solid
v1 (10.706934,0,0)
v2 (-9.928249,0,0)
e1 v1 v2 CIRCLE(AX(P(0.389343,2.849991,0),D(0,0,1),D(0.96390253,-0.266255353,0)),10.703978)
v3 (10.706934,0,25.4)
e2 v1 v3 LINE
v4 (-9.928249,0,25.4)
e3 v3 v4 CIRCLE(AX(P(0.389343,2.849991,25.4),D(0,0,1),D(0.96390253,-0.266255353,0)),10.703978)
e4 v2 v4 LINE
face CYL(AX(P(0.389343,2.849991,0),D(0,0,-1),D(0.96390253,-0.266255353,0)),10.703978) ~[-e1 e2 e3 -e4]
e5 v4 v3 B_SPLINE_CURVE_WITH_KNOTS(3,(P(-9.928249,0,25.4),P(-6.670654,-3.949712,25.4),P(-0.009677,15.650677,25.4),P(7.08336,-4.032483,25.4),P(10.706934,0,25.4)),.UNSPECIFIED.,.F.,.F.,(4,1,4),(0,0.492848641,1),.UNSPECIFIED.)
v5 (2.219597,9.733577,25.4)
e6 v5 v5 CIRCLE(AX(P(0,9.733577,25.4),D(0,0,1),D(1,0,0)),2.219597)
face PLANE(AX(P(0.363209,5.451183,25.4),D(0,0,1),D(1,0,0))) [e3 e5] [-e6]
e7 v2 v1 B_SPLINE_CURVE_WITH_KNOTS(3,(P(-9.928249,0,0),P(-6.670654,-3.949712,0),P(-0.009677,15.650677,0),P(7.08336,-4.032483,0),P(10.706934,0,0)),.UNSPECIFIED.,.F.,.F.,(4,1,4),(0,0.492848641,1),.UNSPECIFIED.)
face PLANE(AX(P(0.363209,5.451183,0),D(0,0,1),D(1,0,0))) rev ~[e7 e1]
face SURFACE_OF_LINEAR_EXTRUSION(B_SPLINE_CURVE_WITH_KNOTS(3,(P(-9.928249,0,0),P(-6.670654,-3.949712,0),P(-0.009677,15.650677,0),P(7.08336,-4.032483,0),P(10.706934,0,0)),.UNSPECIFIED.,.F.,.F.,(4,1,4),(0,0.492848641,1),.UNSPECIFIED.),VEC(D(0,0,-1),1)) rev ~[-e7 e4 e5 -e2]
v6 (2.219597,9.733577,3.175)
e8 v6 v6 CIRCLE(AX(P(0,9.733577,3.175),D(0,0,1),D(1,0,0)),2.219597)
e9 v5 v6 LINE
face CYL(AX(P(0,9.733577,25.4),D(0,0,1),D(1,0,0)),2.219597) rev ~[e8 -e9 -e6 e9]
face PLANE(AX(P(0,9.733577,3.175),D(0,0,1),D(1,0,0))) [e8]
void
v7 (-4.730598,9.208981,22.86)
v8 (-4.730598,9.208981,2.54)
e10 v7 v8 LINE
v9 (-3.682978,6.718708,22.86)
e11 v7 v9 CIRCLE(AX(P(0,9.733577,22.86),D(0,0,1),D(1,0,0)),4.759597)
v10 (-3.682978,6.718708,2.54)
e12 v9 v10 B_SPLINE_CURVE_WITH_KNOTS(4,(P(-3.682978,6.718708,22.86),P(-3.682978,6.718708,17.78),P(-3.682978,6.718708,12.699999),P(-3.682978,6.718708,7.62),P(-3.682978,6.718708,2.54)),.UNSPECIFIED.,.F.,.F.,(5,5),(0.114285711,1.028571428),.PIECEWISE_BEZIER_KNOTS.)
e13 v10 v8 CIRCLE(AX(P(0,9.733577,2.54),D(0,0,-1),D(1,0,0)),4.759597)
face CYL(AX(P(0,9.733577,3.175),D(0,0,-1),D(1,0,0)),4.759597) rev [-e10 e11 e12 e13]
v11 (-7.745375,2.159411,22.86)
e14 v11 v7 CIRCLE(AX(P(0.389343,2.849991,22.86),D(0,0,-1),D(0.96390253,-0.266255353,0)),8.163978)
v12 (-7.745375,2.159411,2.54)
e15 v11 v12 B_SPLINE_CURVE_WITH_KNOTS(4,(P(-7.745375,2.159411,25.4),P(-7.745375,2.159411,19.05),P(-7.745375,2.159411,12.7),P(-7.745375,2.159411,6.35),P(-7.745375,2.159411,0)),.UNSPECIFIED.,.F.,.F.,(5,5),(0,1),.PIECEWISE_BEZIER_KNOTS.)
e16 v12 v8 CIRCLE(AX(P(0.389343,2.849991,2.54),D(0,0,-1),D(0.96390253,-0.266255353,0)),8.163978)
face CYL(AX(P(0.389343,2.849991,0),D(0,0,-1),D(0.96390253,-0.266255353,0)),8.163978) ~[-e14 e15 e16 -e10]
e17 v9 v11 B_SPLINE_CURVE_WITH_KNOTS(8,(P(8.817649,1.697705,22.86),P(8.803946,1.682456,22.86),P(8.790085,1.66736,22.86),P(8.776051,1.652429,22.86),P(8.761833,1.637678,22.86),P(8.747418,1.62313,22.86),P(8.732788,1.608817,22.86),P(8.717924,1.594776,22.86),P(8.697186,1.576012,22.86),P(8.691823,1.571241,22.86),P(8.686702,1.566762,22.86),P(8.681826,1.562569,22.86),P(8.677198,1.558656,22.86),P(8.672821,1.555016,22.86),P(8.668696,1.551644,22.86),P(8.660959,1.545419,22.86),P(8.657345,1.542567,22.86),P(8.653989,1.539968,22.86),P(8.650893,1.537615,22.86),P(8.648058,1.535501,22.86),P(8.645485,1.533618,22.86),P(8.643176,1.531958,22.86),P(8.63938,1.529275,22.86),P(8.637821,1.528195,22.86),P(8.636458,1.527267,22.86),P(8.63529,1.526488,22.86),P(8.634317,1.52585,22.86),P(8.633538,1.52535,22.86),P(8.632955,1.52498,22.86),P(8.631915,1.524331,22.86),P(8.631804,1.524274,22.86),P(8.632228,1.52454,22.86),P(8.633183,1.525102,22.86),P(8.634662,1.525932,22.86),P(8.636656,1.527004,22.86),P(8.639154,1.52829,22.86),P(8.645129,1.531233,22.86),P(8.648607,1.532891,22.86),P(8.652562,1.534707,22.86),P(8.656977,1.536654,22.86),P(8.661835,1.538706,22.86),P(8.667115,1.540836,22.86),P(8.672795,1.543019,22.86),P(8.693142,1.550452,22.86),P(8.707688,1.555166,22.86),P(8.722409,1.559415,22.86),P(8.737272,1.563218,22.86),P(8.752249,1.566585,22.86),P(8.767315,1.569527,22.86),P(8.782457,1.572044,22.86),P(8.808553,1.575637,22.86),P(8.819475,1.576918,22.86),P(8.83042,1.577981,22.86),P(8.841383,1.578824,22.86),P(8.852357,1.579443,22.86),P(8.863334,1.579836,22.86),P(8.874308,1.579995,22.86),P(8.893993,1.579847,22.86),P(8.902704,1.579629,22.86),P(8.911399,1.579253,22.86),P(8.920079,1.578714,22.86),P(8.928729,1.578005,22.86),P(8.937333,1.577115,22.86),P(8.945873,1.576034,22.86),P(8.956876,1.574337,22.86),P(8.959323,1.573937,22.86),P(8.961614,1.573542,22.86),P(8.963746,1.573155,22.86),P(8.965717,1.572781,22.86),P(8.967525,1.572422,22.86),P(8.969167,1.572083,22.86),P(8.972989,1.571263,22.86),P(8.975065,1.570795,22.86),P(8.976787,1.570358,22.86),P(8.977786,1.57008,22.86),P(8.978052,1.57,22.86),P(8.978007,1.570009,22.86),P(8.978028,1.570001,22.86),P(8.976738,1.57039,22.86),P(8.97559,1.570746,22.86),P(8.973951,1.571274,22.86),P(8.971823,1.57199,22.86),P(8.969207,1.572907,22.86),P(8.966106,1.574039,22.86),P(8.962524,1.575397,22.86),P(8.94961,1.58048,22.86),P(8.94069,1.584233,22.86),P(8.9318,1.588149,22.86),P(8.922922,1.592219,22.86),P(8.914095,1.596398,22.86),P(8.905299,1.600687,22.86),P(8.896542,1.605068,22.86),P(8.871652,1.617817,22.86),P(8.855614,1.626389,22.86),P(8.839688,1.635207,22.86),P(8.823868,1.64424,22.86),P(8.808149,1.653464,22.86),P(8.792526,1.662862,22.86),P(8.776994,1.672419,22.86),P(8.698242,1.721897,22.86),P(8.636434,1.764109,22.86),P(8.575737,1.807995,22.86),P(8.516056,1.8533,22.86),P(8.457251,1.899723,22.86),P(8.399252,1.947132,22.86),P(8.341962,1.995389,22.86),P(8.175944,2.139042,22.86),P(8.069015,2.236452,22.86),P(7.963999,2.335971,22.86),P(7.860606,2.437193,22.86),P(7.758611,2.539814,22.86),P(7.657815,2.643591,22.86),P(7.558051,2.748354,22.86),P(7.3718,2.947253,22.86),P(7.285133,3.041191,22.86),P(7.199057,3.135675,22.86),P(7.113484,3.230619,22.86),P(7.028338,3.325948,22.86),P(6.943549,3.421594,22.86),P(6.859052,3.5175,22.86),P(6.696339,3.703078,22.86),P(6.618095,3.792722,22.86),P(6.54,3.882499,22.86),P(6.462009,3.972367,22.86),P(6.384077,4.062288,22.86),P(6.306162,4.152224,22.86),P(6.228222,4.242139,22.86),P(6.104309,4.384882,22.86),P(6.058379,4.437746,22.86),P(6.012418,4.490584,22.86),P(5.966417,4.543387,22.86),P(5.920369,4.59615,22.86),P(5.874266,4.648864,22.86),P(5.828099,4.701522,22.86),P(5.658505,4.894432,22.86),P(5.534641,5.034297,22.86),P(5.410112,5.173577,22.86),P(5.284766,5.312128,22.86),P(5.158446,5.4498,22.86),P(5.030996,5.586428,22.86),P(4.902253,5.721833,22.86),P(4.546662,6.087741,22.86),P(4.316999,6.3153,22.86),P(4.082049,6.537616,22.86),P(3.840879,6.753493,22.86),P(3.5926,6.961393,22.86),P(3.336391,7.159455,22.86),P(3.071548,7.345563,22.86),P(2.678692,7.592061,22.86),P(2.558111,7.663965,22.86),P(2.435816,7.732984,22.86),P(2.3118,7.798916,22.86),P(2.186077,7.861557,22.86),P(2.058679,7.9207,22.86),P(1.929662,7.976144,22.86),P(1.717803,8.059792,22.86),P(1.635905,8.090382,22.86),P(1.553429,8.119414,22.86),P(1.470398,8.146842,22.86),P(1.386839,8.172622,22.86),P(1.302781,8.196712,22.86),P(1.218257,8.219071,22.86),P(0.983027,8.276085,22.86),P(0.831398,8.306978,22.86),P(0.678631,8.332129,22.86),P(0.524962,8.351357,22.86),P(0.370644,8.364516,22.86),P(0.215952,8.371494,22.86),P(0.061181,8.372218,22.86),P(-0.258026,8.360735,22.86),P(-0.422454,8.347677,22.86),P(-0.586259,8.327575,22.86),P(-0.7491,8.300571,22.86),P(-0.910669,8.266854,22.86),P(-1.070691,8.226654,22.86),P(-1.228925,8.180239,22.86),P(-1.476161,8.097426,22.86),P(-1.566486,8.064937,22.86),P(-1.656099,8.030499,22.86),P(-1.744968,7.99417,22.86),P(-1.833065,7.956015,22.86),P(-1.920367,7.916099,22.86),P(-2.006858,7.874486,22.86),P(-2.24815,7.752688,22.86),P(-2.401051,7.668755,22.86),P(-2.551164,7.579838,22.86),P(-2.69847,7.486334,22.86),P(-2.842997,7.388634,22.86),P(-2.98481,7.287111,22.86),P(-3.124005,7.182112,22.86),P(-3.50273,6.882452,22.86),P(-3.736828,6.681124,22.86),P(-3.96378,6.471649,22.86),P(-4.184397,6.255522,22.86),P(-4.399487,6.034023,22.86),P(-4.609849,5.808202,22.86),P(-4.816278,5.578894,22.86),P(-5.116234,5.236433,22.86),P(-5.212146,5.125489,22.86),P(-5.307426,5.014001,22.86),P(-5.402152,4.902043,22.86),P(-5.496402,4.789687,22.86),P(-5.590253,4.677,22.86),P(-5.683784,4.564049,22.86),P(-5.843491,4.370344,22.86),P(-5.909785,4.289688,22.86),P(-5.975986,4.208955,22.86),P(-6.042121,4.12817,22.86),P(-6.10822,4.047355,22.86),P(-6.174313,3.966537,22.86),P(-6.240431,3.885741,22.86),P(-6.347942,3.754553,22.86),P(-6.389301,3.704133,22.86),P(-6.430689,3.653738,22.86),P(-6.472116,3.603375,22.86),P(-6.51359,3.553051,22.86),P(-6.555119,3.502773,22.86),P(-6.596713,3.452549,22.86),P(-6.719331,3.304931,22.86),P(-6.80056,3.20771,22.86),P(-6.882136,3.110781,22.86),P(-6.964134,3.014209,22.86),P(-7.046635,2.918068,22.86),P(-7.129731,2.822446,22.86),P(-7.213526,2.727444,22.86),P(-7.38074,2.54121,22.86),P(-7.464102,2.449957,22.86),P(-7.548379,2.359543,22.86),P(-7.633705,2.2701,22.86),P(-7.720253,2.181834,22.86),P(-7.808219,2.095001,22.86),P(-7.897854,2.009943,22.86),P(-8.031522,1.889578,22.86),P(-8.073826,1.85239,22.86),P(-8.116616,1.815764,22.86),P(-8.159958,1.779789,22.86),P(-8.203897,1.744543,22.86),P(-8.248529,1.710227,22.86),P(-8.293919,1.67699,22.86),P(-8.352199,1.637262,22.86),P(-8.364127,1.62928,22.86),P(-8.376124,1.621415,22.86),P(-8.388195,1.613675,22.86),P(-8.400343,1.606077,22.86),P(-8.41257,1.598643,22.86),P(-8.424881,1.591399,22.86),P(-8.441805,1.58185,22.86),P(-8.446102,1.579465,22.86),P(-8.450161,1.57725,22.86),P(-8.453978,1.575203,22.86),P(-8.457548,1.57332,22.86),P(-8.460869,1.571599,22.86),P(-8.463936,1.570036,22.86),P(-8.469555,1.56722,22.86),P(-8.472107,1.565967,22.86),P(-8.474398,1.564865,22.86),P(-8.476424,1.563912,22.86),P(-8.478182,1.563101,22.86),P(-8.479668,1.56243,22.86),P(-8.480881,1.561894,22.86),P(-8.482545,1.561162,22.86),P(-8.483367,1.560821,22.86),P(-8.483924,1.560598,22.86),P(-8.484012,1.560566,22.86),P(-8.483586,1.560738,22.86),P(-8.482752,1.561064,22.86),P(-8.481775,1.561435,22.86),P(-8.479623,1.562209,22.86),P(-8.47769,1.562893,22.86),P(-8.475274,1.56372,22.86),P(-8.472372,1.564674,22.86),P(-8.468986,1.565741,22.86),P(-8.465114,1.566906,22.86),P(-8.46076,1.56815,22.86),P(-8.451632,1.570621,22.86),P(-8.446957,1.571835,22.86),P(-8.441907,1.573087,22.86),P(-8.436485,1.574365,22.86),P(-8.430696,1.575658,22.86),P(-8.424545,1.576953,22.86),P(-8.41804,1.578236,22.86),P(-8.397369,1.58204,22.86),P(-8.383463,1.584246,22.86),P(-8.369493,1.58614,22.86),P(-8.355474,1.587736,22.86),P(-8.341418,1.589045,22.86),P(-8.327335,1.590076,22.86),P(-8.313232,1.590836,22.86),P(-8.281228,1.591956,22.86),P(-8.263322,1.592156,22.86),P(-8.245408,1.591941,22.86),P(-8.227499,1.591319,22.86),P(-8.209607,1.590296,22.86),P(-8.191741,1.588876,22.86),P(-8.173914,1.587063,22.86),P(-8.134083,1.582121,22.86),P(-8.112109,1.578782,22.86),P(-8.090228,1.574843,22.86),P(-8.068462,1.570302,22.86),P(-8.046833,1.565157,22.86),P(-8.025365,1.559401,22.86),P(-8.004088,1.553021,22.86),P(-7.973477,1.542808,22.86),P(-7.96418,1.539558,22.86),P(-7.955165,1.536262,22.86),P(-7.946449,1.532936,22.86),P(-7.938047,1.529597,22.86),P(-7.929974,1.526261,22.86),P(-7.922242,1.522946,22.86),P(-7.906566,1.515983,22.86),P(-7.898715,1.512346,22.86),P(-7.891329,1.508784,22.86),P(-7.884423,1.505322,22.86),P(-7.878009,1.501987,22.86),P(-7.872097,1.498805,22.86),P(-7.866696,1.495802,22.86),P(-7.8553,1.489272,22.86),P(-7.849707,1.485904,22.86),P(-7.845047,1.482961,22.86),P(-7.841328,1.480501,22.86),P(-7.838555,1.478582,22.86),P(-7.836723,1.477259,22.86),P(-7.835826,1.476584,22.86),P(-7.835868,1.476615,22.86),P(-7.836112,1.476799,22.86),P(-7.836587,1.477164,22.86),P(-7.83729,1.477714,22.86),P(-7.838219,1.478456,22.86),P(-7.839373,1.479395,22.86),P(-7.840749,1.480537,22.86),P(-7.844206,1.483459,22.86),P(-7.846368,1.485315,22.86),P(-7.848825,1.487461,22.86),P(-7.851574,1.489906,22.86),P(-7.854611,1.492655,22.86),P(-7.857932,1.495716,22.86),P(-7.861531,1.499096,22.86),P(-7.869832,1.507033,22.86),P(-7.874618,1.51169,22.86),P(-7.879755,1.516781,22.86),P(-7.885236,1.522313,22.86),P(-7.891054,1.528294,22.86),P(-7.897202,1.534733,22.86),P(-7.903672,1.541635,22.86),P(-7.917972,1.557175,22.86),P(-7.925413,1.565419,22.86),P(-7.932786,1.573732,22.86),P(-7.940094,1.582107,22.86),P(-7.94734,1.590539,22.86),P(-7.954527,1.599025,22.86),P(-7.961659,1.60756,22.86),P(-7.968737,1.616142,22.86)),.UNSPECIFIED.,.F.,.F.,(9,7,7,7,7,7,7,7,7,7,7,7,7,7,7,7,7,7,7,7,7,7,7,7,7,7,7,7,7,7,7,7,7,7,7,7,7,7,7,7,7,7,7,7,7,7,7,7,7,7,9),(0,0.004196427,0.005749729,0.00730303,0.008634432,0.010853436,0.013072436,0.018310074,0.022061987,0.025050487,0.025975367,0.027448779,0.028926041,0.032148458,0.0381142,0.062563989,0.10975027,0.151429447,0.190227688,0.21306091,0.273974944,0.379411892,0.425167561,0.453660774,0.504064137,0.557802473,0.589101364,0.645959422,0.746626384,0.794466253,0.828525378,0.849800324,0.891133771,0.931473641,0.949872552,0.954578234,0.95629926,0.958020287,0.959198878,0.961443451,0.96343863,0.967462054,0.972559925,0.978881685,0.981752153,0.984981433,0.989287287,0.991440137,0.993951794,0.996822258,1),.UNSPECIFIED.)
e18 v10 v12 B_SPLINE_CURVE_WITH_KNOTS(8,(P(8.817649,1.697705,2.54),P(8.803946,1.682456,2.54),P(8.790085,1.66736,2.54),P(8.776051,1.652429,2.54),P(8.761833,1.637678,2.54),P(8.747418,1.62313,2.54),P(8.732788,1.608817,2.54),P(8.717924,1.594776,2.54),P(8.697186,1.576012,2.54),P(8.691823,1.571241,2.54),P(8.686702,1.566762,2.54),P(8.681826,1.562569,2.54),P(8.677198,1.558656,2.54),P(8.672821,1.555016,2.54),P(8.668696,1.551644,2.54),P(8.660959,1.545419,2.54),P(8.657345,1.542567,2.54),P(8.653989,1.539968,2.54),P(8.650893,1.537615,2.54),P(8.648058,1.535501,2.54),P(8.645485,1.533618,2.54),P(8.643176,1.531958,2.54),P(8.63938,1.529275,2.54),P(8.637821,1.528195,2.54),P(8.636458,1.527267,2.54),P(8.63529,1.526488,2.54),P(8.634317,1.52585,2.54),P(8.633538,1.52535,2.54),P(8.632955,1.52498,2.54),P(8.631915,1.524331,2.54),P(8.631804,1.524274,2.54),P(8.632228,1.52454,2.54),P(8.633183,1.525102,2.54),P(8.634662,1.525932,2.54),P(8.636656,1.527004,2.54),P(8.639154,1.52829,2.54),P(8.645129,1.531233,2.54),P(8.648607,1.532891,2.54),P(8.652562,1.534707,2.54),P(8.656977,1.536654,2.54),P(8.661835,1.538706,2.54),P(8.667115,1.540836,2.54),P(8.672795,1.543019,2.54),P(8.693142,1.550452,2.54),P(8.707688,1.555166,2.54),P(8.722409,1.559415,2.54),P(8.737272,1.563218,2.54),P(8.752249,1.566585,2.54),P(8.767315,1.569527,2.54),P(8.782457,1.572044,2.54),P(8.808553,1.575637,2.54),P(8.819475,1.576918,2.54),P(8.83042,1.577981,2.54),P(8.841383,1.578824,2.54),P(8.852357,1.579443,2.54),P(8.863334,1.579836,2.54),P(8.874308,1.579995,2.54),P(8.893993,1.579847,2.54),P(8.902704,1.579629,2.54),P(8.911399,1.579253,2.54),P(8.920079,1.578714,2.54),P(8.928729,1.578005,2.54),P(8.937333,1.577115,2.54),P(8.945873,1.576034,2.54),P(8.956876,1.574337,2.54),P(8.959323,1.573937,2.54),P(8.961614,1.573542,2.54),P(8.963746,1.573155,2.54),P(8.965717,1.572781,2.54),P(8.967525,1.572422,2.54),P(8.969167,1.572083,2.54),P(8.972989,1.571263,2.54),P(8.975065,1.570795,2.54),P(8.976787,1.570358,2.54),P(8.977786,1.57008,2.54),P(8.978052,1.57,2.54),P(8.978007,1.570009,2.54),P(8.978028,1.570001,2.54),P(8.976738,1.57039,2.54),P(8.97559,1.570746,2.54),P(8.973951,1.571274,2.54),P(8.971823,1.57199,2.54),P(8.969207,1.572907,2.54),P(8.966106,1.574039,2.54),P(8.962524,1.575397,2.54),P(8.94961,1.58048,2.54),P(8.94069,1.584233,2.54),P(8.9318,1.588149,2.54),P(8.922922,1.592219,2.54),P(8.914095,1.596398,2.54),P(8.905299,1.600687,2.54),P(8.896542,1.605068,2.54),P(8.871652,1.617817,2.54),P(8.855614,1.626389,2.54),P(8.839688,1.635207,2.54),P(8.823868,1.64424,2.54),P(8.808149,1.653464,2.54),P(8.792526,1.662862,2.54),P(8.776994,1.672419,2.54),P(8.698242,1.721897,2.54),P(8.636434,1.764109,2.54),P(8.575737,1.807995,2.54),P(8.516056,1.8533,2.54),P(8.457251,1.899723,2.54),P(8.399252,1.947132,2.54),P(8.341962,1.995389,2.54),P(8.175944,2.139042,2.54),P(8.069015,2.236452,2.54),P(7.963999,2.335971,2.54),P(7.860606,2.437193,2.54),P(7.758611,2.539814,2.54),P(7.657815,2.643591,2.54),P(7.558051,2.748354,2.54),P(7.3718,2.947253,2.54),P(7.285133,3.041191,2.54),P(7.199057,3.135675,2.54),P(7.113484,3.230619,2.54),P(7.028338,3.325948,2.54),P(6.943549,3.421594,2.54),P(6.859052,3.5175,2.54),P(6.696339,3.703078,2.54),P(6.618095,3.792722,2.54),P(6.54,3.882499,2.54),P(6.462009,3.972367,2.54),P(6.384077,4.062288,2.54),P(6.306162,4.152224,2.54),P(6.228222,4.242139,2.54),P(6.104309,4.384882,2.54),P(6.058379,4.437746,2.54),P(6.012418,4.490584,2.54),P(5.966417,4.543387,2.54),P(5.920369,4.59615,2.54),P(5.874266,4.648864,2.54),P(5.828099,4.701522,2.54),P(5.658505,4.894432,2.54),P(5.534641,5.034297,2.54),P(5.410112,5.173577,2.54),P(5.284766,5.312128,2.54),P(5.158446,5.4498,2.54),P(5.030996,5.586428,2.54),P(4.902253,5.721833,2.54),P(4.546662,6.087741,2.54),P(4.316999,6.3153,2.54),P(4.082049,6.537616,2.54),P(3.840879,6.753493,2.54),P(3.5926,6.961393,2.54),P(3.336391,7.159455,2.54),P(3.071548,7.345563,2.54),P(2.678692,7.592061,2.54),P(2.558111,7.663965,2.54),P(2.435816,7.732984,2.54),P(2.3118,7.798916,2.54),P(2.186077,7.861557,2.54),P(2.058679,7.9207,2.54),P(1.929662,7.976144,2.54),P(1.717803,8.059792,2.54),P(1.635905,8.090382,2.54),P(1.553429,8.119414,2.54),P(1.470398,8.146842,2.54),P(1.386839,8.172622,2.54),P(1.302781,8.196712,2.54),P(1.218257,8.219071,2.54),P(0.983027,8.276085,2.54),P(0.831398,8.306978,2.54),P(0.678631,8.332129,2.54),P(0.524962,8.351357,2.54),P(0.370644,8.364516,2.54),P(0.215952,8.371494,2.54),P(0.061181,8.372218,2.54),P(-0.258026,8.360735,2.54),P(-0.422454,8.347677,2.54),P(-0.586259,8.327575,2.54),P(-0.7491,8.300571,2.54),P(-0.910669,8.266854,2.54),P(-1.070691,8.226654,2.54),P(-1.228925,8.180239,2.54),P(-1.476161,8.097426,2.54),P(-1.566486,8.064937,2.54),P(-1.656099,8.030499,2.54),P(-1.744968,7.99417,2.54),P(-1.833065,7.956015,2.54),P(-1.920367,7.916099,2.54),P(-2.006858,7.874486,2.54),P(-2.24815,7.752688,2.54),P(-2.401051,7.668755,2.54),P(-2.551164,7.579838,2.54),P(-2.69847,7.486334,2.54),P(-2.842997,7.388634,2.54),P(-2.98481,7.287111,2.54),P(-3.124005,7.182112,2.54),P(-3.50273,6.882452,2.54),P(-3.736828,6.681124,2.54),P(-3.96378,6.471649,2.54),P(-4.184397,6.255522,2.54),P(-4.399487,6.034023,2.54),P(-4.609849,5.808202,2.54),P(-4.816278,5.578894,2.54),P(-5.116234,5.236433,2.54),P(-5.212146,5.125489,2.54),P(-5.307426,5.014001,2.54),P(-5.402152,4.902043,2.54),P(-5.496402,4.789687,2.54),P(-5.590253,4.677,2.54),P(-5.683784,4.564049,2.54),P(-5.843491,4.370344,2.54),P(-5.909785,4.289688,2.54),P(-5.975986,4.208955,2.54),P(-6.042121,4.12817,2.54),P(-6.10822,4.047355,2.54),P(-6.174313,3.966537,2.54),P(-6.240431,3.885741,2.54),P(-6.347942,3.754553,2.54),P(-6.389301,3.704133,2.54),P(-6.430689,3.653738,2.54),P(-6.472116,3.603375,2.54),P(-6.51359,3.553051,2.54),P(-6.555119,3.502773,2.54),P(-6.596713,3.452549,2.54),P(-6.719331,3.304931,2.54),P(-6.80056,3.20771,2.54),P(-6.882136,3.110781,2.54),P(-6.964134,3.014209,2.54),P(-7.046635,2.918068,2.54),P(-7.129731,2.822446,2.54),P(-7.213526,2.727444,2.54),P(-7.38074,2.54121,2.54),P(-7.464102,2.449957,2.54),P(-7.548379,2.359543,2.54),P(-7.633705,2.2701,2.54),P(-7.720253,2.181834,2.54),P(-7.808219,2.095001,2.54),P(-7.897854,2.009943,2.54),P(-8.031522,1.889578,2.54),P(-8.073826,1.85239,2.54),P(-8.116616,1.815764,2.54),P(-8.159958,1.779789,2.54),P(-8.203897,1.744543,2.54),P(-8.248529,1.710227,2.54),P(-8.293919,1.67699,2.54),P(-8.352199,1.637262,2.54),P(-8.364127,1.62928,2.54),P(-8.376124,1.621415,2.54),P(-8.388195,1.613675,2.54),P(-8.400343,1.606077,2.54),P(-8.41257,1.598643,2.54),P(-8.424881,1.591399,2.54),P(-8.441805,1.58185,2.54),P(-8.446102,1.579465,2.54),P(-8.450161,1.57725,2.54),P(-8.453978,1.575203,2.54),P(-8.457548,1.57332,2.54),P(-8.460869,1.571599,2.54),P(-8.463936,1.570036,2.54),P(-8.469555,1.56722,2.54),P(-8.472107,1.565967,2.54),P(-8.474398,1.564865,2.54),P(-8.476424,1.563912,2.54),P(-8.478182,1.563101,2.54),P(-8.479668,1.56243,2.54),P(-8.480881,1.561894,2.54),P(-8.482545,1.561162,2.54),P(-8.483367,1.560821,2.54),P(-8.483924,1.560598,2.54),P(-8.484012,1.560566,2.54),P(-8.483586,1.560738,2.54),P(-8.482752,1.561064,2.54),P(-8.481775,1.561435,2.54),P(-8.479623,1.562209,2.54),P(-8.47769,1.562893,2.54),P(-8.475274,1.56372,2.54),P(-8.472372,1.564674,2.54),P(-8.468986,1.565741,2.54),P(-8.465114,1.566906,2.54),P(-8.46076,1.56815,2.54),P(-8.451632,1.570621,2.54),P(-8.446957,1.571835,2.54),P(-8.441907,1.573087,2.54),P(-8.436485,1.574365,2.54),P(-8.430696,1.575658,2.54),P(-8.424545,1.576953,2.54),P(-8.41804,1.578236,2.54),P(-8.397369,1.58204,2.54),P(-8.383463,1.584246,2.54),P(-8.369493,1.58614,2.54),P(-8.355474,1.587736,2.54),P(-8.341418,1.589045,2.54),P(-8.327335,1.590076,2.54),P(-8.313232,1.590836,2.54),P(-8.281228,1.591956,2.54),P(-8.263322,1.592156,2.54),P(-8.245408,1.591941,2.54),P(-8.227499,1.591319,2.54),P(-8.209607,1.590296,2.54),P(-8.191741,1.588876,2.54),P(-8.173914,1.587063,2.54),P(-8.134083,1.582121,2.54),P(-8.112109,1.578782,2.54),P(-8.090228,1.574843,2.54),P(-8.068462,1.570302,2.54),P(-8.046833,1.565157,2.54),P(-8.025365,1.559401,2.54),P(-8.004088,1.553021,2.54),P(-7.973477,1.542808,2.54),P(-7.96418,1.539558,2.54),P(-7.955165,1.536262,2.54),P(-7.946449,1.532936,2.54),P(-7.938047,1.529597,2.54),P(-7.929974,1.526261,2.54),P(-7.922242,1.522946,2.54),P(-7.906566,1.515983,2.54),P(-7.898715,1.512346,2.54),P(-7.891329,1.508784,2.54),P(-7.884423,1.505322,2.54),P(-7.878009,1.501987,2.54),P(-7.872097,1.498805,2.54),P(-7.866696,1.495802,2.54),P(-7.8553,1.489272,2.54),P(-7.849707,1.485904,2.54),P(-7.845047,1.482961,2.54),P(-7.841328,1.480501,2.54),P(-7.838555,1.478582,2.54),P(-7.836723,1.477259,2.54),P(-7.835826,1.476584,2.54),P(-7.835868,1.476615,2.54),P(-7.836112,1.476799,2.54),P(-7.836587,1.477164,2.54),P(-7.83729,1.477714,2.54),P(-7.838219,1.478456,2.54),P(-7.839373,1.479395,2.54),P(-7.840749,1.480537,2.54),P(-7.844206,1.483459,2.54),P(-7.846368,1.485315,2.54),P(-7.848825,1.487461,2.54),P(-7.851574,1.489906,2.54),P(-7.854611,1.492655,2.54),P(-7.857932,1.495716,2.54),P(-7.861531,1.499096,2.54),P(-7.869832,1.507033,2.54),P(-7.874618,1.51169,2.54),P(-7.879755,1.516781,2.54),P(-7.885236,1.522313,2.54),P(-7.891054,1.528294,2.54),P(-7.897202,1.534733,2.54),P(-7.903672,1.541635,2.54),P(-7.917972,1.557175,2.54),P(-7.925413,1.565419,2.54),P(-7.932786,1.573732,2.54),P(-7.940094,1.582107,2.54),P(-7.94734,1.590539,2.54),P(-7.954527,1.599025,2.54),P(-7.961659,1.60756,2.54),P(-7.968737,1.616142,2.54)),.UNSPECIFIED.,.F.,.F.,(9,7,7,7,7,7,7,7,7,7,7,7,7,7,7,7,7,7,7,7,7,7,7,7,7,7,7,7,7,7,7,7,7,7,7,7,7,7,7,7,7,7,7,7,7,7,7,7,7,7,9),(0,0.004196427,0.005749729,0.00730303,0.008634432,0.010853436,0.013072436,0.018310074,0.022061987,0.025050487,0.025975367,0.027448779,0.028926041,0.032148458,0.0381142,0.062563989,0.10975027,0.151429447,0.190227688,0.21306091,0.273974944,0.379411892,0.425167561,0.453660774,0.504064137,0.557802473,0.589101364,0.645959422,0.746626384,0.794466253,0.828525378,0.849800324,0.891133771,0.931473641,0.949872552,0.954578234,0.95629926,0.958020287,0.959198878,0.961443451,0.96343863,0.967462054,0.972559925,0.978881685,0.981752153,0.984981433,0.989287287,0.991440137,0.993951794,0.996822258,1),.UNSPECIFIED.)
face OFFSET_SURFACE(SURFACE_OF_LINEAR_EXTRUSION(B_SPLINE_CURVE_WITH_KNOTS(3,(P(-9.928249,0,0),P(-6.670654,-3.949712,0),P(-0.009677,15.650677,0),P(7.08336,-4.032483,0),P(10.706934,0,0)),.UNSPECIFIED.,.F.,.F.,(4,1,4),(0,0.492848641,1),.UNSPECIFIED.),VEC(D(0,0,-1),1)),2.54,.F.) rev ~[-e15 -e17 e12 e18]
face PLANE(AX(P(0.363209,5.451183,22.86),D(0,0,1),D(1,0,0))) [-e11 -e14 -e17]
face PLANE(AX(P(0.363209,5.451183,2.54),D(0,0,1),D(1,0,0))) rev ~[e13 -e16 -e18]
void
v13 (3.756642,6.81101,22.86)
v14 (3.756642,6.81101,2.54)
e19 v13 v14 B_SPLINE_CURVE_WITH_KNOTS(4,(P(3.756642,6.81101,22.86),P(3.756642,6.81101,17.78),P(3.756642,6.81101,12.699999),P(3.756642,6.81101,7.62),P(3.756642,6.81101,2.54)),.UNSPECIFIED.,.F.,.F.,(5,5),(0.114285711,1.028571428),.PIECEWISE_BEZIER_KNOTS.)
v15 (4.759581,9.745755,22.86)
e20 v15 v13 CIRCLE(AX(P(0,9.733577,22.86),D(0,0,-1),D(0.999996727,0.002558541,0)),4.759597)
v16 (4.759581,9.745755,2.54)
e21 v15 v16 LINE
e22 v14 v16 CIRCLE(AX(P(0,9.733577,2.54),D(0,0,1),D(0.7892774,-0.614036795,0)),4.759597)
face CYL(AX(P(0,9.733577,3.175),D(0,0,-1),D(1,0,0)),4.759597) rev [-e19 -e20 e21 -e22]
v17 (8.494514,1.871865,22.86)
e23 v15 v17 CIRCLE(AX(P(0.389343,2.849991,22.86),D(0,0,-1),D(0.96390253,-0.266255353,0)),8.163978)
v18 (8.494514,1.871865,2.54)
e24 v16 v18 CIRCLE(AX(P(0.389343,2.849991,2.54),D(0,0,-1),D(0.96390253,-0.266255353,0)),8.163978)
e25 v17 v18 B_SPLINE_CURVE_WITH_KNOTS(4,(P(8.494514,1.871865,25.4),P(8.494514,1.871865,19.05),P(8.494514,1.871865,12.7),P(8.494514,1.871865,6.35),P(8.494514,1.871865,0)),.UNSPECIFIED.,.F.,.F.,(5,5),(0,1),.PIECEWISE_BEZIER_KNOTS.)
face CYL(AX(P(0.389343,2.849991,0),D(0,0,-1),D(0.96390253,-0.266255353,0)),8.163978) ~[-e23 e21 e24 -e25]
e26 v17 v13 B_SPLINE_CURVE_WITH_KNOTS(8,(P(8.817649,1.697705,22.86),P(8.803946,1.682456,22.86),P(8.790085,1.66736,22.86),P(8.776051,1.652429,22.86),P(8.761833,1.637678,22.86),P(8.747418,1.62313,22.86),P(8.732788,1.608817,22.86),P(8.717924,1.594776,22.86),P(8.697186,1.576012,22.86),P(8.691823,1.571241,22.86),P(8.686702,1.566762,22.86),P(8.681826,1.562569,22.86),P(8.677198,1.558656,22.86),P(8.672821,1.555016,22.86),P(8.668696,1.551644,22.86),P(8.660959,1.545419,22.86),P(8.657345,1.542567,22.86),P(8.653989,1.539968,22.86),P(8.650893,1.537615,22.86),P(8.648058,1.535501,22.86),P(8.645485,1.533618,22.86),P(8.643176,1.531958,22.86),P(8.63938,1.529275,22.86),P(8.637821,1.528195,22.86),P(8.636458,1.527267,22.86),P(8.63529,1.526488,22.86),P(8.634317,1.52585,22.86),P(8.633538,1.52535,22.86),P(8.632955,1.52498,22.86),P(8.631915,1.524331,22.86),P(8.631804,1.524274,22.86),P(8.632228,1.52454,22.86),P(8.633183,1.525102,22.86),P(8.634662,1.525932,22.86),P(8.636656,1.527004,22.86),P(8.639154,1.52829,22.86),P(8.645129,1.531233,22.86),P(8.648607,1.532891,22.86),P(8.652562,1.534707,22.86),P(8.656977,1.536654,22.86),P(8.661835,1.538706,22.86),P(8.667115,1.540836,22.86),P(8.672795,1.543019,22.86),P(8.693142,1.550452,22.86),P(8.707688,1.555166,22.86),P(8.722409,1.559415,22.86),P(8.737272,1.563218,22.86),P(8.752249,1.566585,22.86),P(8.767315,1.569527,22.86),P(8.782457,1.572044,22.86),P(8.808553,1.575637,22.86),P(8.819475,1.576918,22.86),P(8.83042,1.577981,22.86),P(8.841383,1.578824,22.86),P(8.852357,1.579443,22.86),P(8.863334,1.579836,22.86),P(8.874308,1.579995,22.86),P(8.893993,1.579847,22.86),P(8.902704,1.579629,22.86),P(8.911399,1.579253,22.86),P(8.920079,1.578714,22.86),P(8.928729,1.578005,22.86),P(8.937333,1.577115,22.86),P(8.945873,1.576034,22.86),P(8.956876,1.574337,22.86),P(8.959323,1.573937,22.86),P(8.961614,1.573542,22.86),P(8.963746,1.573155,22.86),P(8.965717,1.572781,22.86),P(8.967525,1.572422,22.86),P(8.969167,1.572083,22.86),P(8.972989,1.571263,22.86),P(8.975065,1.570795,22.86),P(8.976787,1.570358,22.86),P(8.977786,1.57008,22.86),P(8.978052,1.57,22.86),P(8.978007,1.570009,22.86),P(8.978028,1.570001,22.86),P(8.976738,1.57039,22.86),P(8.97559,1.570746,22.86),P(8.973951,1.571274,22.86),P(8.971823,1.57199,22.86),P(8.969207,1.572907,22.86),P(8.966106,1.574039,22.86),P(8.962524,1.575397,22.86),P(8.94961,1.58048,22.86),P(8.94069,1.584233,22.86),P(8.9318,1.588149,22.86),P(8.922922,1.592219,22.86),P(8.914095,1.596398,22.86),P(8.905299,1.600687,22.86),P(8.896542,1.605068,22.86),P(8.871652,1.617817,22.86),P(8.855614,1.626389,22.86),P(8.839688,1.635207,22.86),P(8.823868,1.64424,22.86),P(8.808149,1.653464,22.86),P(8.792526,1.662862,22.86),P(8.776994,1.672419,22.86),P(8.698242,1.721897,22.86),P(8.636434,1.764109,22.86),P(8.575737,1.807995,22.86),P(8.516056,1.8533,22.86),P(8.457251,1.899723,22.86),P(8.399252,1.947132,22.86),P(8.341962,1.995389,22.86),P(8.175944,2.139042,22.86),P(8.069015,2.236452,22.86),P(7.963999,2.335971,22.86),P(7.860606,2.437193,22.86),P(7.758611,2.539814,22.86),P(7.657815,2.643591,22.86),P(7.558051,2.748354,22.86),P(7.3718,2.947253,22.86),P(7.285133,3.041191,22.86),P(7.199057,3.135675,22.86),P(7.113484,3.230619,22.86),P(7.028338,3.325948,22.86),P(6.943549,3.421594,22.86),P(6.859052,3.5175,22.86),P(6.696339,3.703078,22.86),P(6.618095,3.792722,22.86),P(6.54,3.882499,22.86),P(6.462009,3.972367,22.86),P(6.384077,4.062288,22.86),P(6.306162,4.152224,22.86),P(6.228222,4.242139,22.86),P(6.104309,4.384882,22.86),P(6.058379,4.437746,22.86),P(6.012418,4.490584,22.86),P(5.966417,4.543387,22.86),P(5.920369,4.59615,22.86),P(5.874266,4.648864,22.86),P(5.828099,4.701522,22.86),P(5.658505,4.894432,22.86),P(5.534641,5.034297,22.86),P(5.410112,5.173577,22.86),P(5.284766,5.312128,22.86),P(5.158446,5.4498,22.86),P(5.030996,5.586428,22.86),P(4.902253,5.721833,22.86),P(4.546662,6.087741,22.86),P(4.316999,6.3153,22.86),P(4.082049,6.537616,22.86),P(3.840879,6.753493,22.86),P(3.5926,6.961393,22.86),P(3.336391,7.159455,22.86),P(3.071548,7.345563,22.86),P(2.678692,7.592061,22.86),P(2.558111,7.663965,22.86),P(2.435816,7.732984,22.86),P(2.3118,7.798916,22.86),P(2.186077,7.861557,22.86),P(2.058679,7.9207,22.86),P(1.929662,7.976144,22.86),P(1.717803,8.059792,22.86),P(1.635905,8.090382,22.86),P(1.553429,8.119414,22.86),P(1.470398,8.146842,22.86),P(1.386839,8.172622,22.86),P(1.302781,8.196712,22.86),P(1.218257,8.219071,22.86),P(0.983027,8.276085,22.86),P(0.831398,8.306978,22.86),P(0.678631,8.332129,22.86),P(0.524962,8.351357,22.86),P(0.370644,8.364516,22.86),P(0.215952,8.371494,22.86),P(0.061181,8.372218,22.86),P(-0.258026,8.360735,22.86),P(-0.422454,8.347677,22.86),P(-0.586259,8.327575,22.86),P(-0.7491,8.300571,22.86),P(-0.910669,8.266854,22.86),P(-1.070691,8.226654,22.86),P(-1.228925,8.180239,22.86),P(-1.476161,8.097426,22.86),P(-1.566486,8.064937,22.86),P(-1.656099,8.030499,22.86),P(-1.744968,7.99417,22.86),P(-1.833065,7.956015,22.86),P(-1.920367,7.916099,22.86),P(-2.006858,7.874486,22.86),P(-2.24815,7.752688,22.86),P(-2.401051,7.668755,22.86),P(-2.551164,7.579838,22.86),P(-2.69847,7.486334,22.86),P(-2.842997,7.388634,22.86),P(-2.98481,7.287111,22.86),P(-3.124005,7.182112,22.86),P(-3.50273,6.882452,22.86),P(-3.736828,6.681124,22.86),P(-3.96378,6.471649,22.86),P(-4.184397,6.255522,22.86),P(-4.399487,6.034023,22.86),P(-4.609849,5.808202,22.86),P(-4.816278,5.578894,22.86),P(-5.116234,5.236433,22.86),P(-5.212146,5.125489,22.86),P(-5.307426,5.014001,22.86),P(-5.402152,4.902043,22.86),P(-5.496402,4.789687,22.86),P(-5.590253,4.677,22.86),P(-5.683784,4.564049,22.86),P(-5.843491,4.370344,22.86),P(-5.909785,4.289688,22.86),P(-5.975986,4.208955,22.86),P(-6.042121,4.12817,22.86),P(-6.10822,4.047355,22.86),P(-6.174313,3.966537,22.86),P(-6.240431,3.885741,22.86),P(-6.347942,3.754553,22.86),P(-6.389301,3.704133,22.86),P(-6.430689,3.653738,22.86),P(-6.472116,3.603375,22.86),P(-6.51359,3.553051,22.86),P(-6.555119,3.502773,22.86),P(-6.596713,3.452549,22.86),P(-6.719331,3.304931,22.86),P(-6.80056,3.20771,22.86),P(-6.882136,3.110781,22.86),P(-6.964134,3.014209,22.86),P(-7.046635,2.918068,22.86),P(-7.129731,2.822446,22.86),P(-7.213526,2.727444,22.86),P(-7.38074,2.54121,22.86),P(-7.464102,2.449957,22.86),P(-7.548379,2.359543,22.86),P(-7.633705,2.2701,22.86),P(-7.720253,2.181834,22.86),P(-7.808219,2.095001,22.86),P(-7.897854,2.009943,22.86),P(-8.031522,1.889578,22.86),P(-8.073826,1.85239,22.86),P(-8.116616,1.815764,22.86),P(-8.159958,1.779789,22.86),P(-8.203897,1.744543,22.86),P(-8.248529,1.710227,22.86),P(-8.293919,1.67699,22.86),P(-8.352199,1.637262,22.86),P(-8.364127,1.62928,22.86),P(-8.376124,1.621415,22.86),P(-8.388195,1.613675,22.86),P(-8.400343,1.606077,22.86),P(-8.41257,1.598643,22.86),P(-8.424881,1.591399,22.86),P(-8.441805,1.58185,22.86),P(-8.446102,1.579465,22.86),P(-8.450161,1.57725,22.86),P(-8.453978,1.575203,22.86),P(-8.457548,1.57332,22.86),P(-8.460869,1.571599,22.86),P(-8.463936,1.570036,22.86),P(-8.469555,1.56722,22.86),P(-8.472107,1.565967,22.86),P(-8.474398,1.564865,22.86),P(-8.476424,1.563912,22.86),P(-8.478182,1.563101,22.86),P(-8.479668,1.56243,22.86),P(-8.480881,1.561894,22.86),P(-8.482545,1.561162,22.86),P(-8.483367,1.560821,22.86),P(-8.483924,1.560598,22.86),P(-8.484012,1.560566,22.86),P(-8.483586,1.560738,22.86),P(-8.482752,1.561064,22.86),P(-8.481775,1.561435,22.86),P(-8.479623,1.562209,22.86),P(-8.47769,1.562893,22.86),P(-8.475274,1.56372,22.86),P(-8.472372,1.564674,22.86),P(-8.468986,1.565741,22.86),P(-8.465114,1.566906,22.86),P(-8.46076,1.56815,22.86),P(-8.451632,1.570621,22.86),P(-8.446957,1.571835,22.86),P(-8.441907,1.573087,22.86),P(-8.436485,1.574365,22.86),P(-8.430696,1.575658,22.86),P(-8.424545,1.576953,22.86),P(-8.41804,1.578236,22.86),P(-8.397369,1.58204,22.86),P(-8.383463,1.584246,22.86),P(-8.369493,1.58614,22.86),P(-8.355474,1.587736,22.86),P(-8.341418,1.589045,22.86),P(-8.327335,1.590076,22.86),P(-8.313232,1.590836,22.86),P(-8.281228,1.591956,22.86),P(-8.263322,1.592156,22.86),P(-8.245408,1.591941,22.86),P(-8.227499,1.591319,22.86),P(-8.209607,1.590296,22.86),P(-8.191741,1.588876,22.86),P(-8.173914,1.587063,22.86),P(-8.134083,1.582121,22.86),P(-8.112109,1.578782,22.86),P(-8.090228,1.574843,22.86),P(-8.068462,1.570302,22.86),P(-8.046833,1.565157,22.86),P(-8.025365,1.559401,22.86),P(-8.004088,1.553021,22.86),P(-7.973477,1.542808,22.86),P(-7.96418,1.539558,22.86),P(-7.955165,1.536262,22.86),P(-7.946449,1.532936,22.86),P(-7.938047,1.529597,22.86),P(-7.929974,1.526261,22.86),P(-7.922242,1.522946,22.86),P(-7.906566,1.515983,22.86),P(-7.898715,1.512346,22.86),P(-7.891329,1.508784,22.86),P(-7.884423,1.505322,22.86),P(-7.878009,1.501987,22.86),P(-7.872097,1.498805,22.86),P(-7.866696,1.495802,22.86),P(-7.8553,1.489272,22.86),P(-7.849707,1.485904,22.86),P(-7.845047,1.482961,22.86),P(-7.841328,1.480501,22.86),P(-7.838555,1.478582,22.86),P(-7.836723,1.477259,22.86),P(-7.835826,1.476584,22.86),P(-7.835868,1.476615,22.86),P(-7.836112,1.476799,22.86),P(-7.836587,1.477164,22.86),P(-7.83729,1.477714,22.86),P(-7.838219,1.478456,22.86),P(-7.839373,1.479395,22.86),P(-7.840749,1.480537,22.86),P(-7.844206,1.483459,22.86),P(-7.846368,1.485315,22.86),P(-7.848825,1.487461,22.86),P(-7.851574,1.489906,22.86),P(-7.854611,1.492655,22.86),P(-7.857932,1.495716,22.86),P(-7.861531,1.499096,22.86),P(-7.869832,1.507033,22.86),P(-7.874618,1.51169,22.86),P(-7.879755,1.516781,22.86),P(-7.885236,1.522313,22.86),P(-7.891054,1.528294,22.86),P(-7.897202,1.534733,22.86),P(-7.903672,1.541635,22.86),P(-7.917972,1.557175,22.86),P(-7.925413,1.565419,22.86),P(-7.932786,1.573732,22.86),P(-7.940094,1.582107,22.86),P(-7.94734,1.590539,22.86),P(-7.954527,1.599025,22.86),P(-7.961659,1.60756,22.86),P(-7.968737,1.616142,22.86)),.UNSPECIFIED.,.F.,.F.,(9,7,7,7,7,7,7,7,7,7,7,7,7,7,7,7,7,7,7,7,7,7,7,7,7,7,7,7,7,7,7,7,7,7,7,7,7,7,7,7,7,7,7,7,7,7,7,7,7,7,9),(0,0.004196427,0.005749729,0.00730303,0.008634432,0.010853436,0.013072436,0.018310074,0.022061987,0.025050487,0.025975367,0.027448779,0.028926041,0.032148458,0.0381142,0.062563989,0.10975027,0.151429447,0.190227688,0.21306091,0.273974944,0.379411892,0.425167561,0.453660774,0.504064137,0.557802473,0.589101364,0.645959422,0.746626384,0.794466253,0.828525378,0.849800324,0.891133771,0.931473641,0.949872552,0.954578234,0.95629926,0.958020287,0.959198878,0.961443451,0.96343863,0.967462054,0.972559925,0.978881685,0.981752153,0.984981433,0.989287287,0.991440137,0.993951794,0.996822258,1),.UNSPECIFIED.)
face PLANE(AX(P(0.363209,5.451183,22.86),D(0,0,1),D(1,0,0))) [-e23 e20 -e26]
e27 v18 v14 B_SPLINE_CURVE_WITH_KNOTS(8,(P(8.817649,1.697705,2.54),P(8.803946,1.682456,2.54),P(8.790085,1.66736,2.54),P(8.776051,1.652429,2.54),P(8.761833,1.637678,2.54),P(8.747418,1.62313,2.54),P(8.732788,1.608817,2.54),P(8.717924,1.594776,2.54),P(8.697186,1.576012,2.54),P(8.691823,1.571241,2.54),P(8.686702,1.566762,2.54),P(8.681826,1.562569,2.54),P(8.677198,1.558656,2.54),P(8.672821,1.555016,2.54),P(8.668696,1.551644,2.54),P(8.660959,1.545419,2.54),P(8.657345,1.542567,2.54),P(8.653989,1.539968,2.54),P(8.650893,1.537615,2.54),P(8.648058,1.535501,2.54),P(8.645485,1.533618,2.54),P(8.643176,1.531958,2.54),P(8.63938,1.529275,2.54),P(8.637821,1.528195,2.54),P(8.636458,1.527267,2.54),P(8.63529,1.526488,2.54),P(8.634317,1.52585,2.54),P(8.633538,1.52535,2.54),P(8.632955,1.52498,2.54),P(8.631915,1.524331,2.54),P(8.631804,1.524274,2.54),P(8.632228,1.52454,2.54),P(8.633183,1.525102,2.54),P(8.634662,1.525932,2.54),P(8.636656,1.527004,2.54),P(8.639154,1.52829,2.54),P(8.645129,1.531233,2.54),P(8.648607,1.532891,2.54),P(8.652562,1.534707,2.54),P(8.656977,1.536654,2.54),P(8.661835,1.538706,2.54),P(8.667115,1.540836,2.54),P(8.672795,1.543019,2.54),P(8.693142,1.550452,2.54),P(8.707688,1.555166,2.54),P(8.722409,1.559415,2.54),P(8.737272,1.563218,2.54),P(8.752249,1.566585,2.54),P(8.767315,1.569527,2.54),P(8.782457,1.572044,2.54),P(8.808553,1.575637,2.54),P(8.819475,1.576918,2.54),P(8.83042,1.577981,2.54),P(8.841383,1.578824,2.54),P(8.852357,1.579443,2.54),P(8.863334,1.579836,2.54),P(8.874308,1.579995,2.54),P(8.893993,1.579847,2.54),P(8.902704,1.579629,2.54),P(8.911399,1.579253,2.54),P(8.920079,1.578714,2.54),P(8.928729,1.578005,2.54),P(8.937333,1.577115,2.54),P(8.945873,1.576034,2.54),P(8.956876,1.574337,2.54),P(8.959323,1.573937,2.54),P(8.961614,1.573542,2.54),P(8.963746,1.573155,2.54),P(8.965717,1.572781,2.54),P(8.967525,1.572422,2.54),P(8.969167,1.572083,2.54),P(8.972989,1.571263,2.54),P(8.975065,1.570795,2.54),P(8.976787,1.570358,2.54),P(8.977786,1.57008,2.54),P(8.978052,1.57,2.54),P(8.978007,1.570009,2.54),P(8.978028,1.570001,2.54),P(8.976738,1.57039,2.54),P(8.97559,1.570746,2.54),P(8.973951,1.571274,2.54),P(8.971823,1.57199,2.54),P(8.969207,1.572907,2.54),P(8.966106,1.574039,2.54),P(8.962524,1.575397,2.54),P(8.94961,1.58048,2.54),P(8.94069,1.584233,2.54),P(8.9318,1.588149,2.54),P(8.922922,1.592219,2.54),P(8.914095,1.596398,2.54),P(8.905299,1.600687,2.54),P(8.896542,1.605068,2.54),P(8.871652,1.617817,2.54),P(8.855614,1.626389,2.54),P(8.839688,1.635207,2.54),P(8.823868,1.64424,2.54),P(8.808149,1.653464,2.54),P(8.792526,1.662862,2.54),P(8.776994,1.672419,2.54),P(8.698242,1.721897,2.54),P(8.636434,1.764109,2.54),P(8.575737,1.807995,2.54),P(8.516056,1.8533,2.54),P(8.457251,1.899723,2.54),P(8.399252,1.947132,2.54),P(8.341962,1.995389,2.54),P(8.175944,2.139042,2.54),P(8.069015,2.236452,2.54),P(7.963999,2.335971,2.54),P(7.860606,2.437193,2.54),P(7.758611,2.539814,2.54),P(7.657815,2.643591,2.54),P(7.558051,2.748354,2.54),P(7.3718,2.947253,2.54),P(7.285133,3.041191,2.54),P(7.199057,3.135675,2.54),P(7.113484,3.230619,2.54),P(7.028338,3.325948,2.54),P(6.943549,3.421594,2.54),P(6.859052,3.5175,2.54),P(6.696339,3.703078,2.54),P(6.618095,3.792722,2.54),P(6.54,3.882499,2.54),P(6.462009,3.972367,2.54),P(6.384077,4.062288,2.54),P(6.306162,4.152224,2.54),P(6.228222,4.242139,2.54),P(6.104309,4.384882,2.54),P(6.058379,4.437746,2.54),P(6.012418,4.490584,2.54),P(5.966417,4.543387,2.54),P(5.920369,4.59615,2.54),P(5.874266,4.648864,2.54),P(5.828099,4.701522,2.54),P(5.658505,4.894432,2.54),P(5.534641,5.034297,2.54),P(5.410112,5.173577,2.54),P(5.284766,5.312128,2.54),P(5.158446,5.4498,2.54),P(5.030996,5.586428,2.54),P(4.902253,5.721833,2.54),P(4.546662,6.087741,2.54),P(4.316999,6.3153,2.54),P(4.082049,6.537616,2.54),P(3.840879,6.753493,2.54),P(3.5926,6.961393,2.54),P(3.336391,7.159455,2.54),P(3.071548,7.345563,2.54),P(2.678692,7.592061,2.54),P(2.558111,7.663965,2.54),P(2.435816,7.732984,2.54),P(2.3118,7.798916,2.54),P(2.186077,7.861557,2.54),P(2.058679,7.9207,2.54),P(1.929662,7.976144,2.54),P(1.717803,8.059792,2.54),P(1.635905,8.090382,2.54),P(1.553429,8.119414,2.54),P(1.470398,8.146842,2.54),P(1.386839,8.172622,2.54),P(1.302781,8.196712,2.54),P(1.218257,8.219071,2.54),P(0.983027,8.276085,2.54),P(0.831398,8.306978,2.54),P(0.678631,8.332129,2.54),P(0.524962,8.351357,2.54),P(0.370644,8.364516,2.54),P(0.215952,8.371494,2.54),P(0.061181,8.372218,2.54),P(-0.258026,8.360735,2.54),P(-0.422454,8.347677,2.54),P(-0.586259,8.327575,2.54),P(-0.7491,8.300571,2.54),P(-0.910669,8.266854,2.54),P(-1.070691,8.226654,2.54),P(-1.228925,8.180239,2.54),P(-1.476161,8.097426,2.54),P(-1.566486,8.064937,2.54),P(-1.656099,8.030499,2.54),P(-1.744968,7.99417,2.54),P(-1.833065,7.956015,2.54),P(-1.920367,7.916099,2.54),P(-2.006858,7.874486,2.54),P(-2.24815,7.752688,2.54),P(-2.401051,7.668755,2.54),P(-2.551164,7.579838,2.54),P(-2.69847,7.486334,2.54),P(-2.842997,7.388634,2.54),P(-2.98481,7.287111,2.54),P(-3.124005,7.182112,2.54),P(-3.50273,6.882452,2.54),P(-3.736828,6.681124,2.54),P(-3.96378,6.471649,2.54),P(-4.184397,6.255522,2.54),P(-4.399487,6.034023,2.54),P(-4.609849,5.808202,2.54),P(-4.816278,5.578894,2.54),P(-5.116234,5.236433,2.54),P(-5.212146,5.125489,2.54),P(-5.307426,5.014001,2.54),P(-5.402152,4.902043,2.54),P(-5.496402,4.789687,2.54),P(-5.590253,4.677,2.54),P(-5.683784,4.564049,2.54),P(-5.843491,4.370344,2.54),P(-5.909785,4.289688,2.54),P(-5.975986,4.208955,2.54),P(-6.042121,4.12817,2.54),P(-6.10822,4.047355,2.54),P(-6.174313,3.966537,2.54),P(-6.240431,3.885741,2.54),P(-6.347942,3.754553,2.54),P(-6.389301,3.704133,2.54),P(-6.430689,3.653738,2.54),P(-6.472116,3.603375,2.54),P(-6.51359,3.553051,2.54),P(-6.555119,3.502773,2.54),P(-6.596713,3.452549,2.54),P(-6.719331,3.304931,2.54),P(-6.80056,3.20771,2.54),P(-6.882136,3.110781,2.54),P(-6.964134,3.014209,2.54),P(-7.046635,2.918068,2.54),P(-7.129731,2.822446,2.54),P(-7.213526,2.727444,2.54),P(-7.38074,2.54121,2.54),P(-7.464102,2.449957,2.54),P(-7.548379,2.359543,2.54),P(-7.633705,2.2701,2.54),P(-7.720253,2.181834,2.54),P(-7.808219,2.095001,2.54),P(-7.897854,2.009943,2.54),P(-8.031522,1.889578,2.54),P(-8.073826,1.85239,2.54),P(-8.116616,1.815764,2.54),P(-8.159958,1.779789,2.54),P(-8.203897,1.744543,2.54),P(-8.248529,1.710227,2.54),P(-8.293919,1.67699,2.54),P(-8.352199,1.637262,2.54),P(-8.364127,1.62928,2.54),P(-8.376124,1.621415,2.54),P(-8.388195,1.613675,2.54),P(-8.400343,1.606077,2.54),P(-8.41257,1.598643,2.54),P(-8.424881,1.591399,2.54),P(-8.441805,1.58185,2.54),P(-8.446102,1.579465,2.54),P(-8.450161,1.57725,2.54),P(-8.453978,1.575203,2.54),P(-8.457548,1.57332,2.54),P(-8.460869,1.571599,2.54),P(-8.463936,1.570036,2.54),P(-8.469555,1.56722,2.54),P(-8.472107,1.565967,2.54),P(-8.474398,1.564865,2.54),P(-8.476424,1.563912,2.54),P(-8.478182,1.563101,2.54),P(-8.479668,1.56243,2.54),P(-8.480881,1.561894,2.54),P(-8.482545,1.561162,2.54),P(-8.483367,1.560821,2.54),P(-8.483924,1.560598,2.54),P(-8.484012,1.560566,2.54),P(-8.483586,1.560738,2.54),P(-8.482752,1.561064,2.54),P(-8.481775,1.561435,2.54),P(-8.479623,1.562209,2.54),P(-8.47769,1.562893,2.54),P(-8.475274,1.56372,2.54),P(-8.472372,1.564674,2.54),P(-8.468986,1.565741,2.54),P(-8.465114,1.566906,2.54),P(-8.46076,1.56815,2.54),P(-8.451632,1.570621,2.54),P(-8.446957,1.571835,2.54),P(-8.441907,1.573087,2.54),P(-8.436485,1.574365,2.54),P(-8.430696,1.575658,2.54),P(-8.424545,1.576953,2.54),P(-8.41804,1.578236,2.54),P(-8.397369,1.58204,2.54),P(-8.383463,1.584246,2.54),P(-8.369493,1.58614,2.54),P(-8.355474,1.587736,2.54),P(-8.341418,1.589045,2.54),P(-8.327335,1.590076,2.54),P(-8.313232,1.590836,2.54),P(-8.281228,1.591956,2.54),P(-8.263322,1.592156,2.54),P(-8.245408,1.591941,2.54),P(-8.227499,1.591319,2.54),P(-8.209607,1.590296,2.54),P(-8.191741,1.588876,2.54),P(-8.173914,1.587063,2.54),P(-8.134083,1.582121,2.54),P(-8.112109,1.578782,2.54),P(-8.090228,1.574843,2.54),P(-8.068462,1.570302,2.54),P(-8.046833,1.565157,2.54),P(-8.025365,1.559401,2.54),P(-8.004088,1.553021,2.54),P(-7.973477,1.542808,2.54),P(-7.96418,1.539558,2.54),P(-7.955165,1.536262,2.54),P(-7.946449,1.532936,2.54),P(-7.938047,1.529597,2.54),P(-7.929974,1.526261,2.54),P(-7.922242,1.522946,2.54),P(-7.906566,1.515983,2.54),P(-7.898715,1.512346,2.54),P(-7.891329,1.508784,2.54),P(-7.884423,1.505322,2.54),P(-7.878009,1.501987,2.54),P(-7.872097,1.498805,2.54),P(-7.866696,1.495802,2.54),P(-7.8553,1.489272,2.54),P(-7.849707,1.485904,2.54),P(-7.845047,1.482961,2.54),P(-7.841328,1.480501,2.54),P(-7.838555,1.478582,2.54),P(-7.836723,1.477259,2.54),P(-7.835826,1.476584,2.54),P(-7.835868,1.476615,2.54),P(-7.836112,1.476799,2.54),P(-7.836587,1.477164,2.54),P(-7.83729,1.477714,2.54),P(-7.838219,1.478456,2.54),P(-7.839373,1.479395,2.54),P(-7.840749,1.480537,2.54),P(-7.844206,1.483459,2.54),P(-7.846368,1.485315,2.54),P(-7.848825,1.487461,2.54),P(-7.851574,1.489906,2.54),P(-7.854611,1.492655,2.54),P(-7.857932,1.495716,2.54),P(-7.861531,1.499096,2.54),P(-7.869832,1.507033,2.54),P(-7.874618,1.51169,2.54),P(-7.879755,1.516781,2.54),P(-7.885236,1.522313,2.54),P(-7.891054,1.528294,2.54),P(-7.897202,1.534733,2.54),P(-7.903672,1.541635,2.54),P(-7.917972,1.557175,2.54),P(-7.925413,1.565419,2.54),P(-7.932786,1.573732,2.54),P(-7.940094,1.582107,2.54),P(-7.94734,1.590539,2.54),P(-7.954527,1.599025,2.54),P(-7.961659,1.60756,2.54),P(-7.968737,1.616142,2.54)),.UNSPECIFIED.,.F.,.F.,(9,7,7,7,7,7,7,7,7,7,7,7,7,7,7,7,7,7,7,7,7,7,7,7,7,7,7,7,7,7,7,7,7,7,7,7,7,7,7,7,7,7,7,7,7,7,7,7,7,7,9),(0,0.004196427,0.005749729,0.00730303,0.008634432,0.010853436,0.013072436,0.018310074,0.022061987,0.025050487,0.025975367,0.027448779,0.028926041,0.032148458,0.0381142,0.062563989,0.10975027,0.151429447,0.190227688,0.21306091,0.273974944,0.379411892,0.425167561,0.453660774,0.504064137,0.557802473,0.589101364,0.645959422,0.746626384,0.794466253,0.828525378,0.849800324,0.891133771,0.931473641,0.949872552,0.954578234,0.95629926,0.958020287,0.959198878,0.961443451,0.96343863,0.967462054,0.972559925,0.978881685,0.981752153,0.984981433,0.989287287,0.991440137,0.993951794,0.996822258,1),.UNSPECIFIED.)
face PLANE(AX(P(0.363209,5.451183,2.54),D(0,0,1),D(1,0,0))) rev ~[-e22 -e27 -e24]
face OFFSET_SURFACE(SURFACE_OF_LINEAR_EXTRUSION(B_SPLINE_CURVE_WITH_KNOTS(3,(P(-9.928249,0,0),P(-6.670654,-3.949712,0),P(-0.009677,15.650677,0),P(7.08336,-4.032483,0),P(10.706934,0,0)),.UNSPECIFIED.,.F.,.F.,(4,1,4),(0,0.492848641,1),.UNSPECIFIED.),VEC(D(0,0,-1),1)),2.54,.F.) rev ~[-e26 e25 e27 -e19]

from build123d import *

# Parameters (mm, degrees)
F1_DEPTH = 25.4
F2_R     = 2.2195966307
F3_DEPTH = 22.225
F4_T     = 2.54


# Not quite as in the source:
# - a shell that OpenCascade refuses in one call is made with other operations: the cavity is built on its own and cut out


with BuildPart() as f1:
    # F0 (on Top) → F1 (new body)
    with BuildSketch(Plane.XY):
        with BuildLine():
            add(Edge.make_bspline(
                [(-9.9282488227, 0), (-6.6706539696, -3.9497121754), (-0.009677335, 15.6506770315), (7.0833598277, -4.0324827548), (10.7069341466, 0)],
                knots=[0, 0, 0, 0, 0.4928486408, 1, 1, 1, 1], degree=3))
            ThreePointArc((10.7069341466, 0), (0.3893426619, 13.5539694573), (-9.9282488227, 0))
        make_face()
    extrude(amount=F1_DEPTH)

    # F2 (on face) → F3 (cut)
    with BuildSketch(Plane.XY.offset(25.4)):
        with Locations((0, 9.7335772589)):
            Circle(F2_R)
    extrude(amount=-F3_DEPTH, mode=Mode.SUBTRACT)

    # F4: shell of thickness 2.54, made by hand


with BuildPart() as f4_core1:
    # F4_t2: copy of F1
    add(f1.part)

    # the walls: a layer under each face that stays
    f4_faces = [f4_core1.faces().sort_by_distance(p)[0] for p in [
        (0.1475396024, 5.8275524101, 12.7),
        (0.3893426619, 13.5539694573, 12.7),
        (0.3893426619, 5.8090971383, 0),
        (0.3893426619, 5.8090971383, 25.4),
        (-2.2195966307, 9.7335772589, 14.2875),
        (0, 9.7335772589, 3.175),
    ]]
    thicken(f4_faces, amount=-F4_T, mode=Mode.SUBTRACT)

    # F4_s3 → F4_t4 (revolve, cut)
    with BuildSketch(Plane.XZ.offset(-9.7335772589)):
        Polygon((2.1941966307, 3.2004), (4.7595966307, 3.175), (4.7595966307, 0.635), (2.2195966307, 0.635), align=None)
    revolve(axis=Axis((0, 9.7335772589, 3.175), (0, 0, 1)), mode=Mode.SUBTRACT)


with BuildPart() as f1_1:
    add(f1.part)

    # what is left inside the walls is the cavity
    f4_cavity = [f4_core1.part.solids().sort_by_distance(p)[0] for p in [
        (-7.093674, 6.050134, 16.086667),
        (7.742605, 6.337968, 16.086667),
    ]]
    add(f4_cavity, mode=Mode.SUBTRACT)


solid = f1_1.part
